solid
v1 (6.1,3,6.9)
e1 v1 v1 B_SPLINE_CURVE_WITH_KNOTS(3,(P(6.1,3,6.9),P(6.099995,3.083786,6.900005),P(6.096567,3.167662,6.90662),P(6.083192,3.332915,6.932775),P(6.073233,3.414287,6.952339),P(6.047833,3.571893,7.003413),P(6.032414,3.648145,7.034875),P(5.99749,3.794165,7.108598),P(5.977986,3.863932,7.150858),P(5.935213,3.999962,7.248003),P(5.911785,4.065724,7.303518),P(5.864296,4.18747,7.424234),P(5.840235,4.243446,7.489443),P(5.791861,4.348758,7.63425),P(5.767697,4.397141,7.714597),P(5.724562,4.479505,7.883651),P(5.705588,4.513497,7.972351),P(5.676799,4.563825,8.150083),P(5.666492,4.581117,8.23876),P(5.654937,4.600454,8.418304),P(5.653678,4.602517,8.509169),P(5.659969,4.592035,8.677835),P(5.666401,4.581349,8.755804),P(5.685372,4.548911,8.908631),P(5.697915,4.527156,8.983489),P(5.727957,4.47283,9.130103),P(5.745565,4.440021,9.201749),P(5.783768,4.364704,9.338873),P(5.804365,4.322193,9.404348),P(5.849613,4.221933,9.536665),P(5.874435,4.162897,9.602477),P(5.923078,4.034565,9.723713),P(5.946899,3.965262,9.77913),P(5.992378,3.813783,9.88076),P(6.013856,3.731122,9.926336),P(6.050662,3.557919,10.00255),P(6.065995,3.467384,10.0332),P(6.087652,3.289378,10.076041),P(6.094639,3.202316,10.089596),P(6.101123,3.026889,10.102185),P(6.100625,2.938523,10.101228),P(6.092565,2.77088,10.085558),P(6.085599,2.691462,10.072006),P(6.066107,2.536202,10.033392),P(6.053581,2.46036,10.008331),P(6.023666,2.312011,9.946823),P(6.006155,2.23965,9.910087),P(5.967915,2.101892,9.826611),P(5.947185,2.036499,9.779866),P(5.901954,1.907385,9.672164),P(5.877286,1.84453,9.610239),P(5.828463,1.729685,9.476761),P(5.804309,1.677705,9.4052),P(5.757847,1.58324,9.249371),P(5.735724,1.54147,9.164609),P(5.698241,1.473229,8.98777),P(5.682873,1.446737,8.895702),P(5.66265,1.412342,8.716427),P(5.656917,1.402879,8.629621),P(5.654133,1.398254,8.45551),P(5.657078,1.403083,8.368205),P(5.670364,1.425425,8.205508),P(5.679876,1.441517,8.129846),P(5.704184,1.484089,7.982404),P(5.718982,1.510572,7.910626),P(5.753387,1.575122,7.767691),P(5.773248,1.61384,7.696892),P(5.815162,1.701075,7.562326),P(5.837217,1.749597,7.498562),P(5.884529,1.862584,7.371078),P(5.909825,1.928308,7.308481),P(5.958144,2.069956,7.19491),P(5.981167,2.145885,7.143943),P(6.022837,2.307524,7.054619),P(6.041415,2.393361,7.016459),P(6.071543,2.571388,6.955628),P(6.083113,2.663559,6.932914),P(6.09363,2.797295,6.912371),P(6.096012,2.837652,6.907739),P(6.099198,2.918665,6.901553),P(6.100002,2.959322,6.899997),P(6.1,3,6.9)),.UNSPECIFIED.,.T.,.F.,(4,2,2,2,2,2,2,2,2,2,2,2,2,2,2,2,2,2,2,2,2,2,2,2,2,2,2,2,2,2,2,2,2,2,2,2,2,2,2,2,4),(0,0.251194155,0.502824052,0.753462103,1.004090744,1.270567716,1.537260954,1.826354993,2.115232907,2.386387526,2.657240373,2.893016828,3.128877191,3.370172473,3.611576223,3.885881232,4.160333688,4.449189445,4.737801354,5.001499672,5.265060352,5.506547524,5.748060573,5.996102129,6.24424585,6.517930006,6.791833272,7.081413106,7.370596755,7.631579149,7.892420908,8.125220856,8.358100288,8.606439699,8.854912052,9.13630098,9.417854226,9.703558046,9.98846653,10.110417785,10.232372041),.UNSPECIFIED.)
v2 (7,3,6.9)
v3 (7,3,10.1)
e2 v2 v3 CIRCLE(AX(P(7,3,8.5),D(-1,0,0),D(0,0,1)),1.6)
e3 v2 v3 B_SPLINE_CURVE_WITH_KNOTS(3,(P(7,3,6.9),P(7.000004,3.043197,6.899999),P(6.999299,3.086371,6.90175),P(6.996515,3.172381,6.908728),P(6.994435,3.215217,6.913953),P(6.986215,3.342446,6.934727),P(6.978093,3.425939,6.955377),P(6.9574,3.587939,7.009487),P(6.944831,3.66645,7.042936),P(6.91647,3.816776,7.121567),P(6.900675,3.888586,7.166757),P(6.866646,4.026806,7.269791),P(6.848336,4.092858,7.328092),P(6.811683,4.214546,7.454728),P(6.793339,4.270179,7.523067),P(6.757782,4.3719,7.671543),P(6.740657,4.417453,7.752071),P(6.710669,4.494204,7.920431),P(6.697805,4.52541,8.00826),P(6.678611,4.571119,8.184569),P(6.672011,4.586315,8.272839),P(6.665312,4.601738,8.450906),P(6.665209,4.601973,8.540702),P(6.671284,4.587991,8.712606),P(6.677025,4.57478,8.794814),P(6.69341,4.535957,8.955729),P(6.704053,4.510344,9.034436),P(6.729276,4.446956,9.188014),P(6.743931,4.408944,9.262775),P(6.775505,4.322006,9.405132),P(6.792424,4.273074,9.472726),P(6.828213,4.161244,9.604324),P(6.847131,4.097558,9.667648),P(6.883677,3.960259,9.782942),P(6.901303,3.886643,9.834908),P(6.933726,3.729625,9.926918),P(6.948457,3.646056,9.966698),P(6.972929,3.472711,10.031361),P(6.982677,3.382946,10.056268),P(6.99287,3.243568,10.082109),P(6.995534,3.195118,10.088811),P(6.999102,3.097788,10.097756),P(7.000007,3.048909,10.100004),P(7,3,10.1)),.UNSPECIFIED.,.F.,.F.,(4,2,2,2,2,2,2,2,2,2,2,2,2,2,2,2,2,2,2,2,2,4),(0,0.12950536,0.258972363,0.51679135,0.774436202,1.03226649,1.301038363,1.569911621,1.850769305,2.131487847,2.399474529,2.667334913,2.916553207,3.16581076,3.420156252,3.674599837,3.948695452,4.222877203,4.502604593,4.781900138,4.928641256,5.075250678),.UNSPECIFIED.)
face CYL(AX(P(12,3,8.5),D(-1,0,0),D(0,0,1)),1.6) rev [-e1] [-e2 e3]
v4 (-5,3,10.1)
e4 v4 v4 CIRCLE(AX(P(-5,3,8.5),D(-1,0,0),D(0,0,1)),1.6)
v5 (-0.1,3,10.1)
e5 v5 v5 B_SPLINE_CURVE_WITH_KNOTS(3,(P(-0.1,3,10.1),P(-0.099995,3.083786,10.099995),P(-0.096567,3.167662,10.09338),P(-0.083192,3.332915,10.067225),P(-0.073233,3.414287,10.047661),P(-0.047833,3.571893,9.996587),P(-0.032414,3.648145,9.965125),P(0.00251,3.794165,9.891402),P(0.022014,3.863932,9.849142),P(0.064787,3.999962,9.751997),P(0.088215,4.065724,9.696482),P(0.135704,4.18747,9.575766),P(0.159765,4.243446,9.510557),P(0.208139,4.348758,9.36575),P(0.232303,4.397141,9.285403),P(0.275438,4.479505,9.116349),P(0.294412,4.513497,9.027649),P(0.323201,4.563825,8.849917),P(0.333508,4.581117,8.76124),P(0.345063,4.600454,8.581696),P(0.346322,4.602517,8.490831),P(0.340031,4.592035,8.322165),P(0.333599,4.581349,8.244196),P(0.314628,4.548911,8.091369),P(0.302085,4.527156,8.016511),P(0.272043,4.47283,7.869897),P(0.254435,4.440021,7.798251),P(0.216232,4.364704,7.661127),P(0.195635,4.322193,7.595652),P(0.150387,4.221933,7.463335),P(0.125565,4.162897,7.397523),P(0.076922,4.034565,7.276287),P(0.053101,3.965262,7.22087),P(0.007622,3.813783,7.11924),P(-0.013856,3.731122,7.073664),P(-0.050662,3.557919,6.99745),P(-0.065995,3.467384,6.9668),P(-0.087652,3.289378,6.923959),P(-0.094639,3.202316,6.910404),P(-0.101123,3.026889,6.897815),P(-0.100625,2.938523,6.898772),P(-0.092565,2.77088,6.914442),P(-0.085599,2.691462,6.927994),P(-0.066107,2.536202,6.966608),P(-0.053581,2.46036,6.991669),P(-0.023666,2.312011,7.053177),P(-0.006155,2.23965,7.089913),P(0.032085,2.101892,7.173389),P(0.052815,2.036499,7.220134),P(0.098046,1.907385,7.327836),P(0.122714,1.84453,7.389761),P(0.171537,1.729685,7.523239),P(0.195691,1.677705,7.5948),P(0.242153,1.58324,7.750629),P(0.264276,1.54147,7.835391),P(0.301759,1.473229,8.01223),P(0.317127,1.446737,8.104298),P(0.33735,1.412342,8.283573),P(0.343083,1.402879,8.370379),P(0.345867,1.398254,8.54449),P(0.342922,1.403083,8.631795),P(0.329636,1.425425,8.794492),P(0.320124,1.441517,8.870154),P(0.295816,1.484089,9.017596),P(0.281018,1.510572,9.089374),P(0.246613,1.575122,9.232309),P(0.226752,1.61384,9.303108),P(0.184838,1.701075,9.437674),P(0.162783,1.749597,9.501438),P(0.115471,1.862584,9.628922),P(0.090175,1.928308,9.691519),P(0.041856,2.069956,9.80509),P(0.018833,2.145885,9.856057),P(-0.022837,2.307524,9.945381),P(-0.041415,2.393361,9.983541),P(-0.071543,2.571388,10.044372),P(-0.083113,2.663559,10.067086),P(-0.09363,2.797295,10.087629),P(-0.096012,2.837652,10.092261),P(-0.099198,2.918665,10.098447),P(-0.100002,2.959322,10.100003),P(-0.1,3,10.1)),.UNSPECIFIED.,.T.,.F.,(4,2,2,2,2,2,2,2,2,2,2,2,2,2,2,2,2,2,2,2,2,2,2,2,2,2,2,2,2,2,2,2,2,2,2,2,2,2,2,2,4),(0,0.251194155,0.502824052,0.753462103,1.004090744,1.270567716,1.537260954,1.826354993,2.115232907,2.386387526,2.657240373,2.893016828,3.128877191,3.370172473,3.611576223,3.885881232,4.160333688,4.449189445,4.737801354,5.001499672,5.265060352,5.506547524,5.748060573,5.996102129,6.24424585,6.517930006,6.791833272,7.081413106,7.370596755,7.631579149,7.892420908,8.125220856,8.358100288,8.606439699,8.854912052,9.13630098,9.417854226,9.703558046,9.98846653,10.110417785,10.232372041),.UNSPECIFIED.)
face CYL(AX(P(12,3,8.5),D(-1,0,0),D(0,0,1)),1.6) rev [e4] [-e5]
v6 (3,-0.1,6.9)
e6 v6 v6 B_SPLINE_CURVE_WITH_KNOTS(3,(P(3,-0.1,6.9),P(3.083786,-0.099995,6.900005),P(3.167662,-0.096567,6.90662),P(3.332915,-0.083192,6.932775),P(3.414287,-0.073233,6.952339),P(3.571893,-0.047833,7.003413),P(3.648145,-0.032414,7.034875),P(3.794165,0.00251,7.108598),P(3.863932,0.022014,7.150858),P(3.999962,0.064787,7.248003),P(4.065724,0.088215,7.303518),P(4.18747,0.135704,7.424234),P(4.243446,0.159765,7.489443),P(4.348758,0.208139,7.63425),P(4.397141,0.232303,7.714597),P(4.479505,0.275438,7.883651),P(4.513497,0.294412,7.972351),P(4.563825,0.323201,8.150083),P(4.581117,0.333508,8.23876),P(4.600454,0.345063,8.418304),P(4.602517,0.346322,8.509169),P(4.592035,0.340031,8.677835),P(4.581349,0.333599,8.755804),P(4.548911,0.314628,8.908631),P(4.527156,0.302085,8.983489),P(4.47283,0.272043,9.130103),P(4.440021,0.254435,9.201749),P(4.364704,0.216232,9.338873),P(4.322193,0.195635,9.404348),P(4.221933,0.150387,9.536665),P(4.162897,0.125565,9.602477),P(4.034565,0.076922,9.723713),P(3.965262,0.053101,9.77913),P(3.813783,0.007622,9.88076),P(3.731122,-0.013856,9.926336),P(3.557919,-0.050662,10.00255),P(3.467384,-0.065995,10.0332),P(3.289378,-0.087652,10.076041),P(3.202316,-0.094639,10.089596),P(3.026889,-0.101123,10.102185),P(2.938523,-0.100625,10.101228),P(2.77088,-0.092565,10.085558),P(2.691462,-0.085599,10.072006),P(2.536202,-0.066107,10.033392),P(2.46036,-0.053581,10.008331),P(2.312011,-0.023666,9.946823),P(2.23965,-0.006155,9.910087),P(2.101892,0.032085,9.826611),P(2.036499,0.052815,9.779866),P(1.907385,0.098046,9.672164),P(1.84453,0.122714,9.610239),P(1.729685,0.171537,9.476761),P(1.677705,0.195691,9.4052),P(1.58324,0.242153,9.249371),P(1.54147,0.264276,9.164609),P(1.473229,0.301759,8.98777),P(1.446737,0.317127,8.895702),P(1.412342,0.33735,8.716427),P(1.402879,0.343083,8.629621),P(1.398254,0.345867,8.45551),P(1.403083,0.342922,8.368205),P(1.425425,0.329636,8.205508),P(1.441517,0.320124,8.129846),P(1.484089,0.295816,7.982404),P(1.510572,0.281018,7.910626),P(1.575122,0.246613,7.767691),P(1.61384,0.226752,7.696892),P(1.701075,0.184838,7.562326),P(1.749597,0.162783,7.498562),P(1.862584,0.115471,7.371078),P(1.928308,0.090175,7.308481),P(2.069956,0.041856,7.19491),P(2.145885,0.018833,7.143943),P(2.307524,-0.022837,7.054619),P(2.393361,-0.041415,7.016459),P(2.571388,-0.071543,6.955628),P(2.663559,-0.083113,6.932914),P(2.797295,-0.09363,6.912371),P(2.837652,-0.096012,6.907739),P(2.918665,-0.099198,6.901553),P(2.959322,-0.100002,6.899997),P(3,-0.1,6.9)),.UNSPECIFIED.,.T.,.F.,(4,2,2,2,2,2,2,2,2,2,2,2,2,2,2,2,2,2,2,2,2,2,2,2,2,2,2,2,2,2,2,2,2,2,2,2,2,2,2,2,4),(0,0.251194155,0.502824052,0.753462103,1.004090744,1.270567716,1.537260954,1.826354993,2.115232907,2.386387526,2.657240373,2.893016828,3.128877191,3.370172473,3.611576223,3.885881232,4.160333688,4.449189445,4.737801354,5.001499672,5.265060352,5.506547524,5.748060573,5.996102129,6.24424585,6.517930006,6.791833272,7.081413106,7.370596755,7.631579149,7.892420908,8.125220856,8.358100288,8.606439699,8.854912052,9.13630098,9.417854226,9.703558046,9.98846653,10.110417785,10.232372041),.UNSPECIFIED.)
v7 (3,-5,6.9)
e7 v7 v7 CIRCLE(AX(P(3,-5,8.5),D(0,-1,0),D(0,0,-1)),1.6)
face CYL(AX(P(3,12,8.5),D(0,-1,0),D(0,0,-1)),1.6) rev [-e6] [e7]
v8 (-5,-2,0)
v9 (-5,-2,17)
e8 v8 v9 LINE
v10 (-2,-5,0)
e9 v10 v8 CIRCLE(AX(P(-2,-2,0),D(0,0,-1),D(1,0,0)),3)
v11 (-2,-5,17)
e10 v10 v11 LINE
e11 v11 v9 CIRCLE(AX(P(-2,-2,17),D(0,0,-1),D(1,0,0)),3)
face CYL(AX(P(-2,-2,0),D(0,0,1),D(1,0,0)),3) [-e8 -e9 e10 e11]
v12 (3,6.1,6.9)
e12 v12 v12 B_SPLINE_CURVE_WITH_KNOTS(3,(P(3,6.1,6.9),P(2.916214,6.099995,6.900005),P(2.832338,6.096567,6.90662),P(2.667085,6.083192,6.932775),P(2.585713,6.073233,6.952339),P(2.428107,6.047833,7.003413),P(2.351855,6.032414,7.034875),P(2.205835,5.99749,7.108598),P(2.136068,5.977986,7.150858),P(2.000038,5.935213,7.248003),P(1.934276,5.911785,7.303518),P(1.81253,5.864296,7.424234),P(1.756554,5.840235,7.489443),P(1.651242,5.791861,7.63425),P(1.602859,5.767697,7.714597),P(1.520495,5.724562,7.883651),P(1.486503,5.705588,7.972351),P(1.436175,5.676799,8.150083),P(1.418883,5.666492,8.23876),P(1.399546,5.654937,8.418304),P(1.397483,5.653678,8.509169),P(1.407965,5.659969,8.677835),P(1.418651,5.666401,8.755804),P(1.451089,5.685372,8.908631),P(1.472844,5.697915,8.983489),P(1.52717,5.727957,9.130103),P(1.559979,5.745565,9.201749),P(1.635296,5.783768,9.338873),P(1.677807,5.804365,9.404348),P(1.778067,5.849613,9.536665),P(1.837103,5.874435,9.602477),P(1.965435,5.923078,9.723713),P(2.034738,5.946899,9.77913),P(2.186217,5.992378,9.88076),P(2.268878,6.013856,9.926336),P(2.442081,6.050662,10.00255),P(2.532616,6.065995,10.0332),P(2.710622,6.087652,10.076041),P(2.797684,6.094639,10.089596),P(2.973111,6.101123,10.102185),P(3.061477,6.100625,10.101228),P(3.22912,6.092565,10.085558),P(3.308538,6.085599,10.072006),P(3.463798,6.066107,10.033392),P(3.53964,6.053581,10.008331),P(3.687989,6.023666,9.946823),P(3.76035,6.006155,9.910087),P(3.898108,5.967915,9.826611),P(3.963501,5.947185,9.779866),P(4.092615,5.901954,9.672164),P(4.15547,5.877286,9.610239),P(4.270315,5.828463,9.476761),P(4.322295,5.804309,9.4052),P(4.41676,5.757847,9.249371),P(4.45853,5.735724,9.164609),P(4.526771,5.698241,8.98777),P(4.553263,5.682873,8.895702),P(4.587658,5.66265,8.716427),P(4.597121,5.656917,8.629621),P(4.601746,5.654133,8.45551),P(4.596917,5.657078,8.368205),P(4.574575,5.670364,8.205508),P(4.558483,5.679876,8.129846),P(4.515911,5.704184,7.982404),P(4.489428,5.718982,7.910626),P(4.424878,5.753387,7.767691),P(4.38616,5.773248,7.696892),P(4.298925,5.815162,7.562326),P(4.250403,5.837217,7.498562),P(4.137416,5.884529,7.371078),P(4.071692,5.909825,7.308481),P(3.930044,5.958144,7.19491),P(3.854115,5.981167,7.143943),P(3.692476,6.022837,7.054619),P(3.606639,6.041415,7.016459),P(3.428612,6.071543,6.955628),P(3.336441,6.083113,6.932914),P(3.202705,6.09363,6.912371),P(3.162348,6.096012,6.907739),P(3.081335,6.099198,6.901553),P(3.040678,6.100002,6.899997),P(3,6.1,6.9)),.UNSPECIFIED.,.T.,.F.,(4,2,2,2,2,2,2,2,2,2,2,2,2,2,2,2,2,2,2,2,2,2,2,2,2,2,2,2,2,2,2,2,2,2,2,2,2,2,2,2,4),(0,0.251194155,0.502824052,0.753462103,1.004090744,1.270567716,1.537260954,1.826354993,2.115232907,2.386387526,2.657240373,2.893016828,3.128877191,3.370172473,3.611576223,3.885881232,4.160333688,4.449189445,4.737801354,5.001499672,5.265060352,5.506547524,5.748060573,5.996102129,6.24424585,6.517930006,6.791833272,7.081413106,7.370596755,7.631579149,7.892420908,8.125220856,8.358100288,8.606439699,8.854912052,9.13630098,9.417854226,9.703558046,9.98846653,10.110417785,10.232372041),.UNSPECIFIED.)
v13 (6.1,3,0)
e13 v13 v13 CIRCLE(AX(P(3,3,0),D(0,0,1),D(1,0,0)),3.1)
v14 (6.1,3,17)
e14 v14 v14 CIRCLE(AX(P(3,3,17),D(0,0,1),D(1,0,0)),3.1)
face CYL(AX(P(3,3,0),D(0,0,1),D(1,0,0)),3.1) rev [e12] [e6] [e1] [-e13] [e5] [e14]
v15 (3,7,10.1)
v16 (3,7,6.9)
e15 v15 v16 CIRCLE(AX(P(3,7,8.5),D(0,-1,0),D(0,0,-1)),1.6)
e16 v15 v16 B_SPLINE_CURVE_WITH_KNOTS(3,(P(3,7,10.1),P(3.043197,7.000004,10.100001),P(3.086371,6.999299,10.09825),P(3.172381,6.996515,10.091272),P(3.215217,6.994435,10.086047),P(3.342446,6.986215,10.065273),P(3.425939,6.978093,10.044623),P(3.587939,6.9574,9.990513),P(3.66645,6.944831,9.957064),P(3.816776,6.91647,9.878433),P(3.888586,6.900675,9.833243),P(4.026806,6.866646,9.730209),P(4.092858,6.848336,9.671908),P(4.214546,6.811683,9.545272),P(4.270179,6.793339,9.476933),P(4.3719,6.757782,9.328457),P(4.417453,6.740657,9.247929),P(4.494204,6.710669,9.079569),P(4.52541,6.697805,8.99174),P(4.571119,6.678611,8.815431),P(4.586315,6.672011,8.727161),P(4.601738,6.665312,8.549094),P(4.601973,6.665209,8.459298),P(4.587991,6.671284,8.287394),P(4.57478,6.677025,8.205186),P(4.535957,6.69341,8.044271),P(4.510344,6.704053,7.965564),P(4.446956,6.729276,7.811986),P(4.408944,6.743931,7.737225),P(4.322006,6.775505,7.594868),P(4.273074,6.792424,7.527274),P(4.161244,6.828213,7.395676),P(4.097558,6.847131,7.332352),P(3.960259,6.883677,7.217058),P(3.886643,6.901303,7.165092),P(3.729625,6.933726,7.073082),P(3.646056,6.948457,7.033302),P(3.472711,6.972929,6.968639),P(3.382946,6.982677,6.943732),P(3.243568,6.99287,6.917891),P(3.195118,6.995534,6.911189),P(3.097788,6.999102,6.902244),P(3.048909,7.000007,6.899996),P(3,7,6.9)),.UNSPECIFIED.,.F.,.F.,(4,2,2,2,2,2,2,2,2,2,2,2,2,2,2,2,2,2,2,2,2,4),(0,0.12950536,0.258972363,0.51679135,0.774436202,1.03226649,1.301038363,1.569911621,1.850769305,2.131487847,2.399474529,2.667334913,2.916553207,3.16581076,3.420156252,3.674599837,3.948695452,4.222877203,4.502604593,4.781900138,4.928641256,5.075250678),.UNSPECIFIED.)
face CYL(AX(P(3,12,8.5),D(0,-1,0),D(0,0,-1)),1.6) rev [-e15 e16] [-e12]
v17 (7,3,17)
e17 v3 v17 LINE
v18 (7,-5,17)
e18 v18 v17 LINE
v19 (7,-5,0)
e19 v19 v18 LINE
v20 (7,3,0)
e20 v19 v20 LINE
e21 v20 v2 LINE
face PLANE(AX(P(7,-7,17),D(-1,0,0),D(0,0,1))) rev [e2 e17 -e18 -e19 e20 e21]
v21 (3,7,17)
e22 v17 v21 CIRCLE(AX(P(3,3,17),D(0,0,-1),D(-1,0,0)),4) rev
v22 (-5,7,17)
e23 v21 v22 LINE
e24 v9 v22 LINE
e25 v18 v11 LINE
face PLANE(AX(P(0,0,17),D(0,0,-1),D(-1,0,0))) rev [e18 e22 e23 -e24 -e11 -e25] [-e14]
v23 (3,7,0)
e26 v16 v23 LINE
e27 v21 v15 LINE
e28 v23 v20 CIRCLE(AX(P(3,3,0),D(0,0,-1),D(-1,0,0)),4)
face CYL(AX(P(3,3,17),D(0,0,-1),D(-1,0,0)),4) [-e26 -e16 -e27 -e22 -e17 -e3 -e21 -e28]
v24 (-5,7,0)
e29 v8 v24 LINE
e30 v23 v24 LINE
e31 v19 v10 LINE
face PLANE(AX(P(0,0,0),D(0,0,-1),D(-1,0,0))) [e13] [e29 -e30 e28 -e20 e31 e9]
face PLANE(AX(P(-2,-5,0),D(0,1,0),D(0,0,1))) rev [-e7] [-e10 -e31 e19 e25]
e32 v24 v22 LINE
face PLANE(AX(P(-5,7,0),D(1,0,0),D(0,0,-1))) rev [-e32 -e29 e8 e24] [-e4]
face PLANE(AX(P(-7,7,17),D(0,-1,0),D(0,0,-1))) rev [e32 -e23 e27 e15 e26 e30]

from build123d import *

# Parameters (mm, degrees)
SKETCH_1_W          = 14
SKETCH_1_H          = 14
EXTRUDE_1_DEPTH     = 17
SKETCH_2_R          = 3.1
CUT_EXTRUDE_1_DEPTH = 20.672315573
FILLET_1_R          = 5
CUT_EXTRUDE_2_DEPTH = 17
SKETCH_4_R          = 1.6
CUT_EXTRUDE_3_DEPTH = 17
SKETCH_5_R          = 1.6
CUT_EXTRUDE_4_DEPTH = 17
FILLET_2_R          = 4


with BuildPart() as part:
    # ｽｹｯﾁ1 → ﾎﾞｽ - 押し出し1 (new body)
    with BuildSketch(Plane.XY):
        Rectangle(SKETCH_1_W, SKETCH_1_H)
    extrude(amount=EXTRUDE_1_DEPTH)

    # ｽｹｯﾁ2 → ｶｯﾄ - 押し出し1 (cut, through all)
    with BuildSketch(Plane.XY.offset(17)):
        with Locations((3, 3)):
            Circle(SKETCH_2_R)
    extrude(amount=-CUT_EXTRUDE_1_DEPTH, mode=Mode.SUBTRACT)

    # ﾌｨﾚｯﾄ1
    fillet_1_edges = [part.edges().sort_by_distance(p)[0] for p in [
        (-7, -7, 8.5),
    ]]
    fillet(fillet_1_edges, radius=FILLET_1_R)

    # ｽｹｯﾁ3 → ｶｯﾄ - 押し出し2 (cut)
    with BuildSketch(Plane.XY.offset(17)):
        with BuildLine():
            Line((-7, 7), (-7, -7))
            Line((-7, -7), (7, -7))
            Line((7, -7), (7, -5))
            Line((7, -5), (-2, -5))
            ThreePointArc((-2, -5), (-4.121320344, -4.121320344), (-5, -2))
            Line((-5, -2), (-5, 7))
            Line((-5, 7), (-7, 7))
        make_face()
    extrude(amount=-CUT_EXTRUDE_2_DEPTH, mode=Mode.SUBTRACT)

    # ｽｹｯﾁ4 → ｶｯﾄ - 押し出し3 (cut)
    with BuildSketch(Plane.XZ.offset(5)):
        with Locations(Location((3, 8.5, 0), (0, 0, 270))):
            Circle(SKETCH_4_R)
    extrude(amount=-CUT_EXTRUDE_3_DEPTH, mode=Mode.SUBTRACT)

    # ｽｹｯﾁ5 → ｶｯﾄ - 押し出し4 (cut)
    with BuildSketch(Plane.ZY.offset(5)):
        with Locations((8.5, 3)):
            Circle(SKETCH_5_R)
    extrude(amount=-CUT_EXTRUDE_4_DEPTH, mode=Mode.SUBTRACT)

    # ﾌｨﾚｯﾄ2
    # the kernel refuses this fillet: 4 mm, written as the material it takes off along each edge
    with BuildSketch(Plane(origin=(7, 7, -10), x_dir=(-1, 0, 0), z_dir=(0, 0, 1))) as fillet_2_piece_1:
        with BuildLine():
            CenterArc((FILLET_2_R, FILLET_2_R), FILLET_2_R, 180, 90)
            Line((0, FILLET_2_R), (0, 0))
            Line((0, 0), (FILLET_2_R, 0))
        make_face()
    extrude(amount=37, mode=Mode.SUBTRACT)


solid = part.part
